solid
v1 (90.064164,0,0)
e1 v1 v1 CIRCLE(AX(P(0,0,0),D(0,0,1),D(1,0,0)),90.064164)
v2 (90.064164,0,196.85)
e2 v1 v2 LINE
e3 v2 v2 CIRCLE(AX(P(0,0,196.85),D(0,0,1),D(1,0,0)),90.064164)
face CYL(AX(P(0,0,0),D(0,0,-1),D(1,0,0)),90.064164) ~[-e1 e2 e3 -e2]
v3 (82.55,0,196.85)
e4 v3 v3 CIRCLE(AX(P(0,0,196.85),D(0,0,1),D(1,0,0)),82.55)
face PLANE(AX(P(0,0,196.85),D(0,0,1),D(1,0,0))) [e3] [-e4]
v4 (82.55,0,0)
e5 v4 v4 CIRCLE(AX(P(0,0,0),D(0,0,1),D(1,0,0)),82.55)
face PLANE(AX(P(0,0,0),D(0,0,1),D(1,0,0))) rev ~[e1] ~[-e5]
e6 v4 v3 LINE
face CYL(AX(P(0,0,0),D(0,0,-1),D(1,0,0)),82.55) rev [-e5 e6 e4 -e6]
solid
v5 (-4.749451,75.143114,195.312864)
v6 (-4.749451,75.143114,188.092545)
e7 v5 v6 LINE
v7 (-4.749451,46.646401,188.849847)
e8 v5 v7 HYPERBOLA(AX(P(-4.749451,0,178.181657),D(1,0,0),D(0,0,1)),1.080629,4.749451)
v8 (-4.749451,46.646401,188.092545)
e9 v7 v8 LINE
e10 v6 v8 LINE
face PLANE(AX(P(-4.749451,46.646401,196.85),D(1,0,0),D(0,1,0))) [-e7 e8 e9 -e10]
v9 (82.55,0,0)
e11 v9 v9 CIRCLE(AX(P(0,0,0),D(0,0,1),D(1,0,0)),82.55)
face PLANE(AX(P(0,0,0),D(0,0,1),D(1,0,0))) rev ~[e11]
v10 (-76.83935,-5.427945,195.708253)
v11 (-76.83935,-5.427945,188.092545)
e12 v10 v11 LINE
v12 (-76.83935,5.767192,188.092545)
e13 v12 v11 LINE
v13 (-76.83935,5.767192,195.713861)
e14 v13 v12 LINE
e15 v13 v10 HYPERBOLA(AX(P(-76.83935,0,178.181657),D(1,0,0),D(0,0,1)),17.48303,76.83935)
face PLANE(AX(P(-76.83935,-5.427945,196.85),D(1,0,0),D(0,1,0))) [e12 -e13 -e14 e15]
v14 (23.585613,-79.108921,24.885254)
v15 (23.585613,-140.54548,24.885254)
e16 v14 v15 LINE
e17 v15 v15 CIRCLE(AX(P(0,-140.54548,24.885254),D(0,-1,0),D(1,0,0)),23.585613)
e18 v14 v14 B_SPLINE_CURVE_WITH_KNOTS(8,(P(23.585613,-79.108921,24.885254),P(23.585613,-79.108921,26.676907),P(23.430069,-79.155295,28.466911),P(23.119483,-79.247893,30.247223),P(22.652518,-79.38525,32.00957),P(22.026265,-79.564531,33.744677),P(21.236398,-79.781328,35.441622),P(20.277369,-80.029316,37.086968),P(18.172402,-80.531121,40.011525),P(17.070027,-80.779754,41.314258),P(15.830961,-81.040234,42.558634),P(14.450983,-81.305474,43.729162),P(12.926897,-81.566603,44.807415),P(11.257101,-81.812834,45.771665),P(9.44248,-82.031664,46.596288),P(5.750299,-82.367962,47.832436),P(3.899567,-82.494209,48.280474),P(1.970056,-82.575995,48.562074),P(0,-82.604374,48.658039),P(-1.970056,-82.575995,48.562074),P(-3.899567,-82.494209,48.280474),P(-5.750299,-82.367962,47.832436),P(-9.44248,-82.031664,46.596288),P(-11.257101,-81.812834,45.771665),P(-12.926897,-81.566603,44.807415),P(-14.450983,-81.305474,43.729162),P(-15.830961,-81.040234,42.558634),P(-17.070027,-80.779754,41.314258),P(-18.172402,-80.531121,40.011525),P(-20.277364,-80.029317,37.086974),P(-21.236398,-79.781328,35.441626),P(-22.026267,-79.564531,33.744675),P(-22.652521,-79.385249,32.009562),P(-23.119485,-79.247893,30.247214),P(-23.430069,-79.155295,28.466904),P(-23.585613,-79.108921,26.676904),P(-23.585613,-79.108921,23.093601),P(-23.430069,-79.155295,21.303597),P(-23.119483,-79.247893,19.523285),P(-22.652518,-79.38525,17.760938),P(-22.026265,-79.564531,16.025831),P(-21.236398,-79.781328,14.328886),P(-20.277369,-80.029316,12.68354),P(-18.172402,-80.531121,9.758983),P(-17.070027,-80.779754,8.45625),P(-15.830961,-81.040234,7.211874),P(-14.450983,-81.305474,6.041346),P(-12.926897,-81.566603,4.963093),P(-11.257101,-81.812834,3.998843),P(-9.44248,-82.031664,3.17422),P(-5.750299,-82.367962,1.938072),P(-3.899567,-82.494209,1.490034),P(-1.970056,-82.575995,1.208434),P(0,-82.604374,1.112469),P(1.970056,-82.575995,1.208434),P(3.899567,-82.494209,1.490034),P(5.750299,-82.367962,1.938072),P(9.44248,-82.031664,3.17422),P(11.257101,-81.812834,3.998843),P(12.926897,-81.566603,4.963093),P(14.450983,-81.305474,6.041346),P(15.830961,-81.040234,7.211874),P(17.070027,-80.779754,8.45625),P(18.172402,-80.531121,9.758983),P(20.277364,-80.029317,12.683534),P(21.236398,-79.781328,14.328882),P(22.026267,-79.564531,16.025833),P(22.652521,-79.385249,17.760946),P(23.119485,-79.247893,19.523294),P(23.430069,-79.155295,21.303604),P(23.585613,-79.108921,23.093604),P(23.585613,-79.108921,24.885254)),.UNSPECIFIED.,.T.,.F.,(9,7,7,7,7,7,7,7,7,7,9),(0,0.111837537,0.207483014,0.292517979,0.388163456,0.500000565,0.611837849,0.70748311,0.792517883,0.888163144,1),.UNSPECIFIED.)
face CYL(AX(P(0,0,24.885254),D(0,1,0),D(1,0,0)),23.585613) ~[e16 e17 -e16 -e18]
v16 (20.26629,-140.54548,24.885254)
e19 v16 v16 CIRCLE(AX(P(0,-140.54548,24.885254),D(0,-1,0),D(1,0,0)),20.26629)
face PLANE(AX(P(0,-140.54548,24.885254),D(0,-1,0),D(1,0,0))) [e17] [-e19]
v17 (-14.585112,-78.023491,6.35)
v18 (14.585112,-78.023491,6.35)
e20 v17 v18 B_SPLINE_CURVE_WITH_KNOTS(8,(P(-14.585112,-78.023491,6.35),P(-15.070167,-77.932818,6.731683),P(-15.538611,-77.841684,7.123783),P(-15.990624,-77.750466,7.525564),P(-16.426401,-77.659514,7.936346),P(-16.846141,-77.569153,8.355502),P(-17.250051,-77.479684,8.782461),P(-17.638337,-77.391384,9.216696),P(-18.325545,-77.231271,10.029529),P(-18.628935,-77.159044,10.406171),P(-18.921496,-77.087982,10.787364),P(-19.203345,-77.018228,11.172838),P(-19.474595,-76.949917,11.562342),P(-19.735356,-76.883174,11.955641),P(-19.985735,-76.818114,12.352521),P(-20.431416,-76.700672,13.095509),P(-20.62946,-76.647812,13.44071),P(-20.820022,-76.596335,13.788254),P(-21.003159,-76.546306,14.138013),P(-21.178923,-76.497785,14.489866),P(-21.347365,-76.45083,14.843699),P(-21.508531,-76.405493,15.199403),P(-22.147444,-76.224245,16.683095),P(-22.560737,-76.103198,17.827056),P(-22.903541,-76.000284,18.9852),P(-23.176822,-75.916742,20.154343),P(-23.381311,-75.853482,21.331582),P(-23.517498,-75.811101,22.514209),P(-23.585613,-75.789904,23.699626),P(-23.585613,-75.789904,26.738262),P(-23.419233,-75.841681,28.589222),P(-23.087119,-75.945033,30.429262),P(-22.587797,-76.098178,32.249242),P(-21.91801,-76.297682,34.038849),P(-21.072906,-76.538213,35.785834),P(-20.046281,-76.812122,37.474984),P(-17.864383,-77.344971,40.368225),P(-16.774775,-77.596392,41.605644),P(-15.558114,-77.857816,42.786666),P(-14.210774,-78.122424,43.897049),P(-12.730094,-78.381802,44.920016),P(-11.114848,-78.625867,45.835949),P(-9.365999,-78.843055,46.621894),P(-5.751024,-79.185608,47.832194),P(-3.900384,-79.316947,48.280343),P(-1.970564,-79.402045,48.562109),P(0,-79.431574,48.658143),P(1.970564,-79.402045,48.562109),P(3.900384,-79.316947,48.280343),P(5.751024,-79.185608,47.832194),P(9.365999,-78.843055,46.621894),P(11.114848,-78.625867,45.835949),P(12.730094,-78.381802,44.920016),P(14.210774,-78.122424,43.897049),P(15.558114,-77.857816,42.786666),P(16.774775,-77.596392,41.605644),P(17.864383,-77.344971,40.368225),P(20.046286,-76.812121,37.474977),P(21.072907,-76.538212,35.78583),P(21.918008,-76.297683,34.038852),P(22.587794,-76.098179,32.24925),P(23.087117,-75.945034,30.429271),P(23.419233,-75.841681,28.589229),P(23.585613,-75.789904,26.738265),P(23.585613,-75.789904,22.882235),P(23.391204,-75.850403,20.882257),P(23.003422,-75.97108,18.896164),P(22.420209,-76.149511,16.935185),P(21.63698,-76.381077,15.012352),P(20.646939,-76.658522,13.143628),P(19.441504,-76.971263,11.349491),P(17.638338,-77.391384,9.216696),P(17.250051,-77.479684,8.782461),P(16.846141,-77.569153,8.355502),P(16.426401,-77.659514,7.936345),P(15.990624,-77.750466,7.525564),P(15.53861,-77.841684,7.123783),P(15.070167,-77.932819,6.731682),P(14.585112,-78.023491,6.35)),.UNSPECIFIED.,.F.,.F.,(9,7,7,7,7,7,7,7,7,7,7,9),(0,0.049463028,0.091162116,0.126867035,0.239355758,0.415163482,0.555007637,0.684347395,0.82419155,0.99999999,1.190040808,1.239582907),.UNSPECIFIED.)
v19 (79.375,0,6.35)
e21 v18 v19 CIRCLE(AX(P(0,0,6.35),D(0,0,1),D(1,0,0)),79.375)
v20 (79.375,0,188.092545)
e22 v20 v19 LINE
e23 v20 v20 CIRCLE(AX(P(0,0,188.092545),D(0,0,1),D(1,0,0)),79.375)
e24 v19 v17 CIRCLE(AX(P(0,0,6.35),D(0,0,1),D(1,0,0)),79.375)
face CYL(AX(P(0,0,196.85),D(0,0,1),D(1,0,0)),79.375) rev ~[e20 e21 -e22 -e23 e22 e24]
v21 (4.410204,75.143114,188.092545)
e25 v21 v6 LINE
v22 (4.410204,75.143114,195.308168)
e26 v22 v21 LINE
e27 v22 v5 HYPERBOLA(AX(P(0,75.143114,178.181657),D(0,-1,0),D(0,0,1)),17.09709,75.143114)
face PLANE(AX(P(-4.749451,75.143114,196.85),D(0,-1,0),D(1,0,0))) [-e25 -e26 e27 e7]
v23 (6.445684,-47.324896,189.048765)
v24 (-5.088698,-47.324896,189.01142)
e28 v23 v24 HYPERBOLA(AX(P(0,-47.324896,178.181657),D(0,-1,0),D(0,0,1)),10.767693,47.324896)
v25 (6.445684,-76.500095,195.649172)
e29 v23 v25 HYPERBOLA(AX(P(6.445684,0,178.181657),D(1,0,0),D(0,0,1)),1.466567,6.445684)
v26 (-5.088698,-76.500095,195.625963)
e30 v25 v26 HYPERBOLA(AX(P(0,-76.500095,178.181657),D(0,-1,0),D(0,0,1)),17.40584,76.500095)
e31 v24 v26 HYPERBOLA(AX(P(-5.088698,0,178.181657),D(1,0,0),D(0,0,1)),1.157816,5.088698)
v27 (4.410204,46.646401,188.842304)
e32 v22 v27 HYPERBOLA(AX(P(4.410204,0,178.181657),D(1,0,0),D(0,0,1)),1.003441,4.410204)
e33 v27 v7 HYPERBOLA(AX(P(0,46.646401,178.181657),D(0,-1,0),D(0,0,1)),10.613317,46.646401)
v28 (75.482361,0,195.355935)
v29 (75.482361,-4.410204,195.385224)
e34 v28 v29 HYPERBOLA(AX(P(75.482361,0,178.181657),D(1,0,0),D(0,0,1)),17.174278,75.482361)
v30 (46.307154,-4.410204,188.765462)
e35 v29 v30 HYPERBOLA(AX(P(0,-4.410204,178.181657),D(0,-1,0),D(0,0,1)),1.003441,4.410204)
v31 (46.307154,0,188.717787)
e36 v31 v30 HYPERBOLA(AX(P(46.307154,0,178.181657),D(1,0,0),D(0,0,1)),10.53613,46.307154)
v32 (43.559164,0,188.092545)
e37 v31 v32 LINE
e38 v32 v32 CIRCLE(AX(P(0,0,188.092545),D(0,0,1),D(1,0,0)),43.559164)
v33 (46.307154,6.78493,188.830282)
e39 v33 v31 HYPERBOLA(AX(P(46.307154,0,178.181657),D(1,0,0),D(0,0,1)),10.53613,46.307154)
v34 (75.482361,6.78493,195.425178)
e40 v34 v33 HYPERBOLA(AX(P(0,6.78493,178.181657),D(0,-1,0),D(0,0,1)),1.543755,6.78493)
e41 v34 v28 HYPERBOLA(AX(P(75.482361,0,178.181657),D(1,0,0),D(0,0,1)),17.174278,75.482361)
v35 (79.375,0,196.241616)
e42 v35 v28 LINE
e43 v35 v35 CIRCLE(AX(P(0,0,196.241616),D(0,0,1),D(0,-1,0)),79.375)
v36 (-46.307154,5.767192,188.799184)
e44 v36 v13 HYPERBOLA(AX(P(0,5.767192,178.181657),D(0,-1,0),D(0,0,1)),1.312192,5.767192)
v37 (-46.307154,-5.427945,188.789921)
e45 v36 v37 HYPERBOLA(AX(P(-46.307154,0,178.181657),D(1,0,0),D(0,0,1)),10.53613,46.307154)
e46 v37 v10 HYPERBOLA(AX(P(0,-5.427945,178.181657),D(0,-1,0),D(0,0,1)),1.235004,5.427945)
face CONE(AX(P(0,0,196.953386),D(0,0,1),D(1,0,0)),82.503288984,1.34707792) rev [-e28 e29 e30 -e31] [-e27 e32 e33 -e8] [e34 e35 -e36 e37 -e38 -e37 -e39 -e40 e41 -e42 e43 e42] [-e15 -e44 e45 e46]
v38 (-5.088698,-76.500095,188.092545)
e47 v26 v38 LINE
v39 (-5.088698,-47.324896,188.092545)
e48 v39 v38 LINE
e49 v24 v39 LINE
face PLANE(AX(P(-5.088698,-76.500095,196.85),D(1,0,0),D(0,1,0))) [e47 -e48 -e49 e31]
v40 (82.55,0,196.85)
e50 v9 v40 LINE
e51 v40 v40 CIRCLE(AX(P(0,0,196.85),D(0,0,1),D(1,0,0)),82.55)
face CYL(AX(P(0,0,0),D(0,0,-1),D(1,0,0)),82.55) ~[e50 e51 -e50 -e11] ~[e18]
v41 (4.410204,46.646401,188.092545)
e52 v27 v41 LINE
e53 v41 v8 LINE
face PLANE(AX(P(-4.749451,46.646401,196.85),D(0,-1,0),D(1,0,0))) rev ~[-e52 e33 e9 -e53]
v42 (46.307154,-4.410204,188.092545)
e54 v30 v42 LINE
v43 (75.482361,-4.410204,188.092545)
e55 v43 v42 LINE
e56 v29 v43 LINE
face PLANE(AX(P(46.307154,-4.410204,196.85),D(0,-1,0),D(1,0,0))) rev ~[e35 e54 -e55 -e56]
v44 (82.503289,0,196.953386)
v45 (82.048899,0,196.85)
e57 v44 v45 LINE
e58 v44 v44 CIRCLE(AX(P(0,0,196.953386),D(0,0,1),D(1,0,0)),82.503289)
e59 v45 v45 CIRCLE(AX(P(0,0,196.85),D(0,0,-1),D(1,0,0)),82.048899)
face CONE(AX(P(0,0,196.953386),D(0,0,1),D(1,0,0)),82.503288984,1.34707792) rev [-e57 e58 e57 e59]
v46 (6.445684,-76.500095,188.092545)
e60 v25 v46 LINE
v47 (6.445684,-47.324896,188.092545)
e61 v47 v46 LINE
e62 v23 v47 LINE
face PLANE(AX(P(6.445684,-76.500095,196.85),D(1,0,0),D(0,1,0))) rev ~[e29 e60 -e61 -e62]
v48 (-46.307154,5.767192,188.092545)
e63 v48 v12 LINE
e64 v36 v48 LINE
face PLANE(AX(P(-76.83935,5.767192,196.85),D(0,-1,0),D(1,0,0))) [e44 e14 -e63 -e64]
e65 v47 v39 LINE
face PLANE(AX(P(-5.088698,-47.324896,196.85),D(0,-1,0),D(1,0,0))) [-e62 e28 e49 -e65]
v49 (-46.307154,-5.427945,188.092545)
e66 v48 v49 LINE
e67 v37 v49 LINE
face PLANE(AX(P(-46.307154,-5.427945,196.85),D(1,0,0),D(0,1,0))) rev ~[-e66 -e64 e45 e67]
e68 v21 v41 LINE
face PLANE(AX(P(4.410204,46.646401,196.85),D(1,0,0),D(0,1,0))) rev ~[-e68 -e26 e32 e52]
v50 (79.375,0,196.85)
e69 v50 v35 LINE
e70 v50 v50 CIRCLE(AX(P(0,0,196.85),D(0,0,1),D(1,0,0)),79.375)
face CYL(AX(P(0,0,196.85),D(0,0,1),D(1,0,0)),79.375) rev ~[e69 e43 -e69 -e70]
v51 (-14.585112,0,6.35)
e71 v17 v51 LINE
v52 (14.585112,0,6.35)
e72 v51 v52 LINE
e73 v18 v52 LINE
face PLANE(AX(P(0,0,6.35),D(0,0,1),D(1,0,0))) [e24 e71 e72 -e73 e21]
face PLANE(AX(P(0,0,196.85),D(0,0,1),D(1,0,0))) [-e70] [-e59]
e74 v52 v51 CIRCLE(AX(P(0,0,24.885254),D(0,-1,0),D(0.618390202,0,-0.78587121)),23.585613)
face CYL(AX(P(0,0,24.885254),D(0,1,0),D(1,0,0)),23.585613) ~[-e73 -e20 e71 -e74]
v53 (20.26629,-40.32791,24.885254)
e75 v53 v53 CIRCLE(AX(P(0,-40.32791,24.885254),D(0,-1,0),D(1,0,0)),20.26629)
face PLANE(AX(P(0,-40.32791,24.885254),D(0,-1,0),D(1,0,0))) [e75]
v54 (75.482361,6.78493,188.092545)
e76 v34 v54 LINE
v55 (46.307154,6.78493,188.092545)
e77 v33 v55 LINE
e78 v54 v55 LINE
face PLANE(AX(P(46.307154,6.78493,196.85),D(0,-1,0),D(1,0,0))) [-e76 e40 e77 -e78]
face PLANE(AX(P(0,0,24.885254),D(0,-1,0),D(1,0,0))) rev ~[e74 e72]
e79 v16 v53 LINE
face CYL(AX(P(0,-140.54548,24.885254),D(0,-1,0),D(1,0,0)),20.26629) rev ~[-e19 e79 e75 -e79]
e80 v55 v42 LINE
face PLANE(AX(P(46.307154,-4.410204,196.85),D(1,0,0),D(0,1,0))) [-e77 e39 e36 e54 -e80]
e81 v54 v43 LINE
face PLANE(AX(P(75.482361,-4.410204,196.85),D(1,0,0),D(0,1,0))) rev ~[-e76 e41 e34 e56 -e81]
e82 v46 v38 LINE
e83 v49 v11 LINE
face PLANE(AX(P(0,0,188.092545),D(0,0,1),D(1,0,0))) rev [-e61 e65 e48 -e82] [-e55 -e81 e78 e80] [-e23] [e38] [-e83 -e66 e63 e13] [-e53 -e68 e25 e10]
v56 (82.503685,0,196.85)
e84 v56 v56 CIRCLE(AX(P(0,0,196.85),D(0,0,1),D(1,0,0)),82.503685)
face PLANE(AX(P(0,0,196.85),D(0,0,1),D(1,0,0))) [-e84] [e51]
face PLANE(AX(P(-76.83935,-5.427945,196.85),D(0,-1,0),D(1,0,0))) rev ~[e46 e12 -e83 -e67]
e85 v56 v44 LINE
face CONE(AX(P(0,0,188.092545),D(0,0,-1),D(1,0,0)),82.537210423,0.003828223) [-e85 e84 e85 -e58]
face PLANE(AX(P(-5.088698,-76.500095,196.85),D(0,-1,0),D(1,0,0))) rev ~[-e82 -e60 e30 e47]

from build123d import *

# Parameters (mm, degrees)
F0_R      = 82.55
F1_DEPTH  = 196.85
F2_R      = 79.375
F3_DEPTH  = 190.5
F9_W      = 9.1596553102
F9_H      = 28.4967124462
F9_W_2    = 29.1752070189
F9_H_2    = 11.1951339059
F9_W_3    = 30.5321961641
F9_H_3    = 11.1951371655
F9_W_4    = 11.5343825892
F9_H_4    = 29.1751995683
F10_DEPTH = 50.8
F11_R     = 23.5856126994
F12_DEPTH = 140.54548
F13_R     = 20.2662897719
F14_DEPTH = 100.21757
F15_R     = 90.0641643282
F15_R_2   = 82.55
F16_DEPTH = 196.85


# Not quite as in the source:
# - the program builds the solid bodies; features that only make, move or delete a surface that nothing else refers to are left out


with BuildPart() as f1:
    # F0 (on Top) → F1 (new body)
    with BuildSketch(Plane.XY):
        Circle(F0_R)
    extrude(amount=F1_DEPTH)

    # F2 (on face) → F3 (cut)
    with BuildSketch(Plane.XY.offset(196.85)):
        Circle(F2_R)
    extrude(amount=-F3_DEPTH, mode=Mode.SUBTRACT)

    # F7 (on Front) → F8 (revolve)
    with BuildSketch(Plane.XZ):
        Polygon((82.5372104228, 188.0925446749), (82.5032889843, 196.9533860683), (43.5591638088, 188.0925446749), align=None)
    revolve(axis=Axis((0, 0, 196.85), (0, 0, 1)))

    # F9 (on offset) → F10 (cut)
    with BuildSketch(Plane.XY.offset(196.85)):
        with Locations((-0.1696236432, 60.8947575092)):
            Rectangle(F9_W, F9_H)
        with Locations((60.8947575092, 1.187362941)):
            Rectangle(F9_W_2, F9_H_2)
        with Locations((-61.5732520819, 0.1696236432)):
            Rectangle(F9_W_3, F9_H_3)
        with Locations((0.6784931757, -61.9124956429)):
            Rectangle(F9_W_4, F9_H_4)
    extrude(amount=-F10_DEPTH, mode=Mode.SUBTRACT)

    # F11 (on Front) → F12 (join)
    with BuildSketch(Plane.XZ):
        with Locations((0, 24.8852539808)):
            Circle(F11_R)
    extrude(amount=F12_DEPTH)

    # F13 (on face) → F14 (cut)
    with BuildSketch(Plane.XZ.offset(140.54548)):
        with Locations((0, 24.8852539808)):
            Circle(F13_R)
    extrude(amount=-F14_DEPTH, mode=Mode.SUBTRACT)


with BuildPart() as f16:
    # F15 (on Top) → F16 (new body)
    with BuildSketch(Plane.XY):
        Circle(F15_R)
        Circle(F15_R_2, mode=Mode.SUBTRACT)
    extrude(amount=F16_DEPTH)


solid = Compound([f1.part, f16.part])
